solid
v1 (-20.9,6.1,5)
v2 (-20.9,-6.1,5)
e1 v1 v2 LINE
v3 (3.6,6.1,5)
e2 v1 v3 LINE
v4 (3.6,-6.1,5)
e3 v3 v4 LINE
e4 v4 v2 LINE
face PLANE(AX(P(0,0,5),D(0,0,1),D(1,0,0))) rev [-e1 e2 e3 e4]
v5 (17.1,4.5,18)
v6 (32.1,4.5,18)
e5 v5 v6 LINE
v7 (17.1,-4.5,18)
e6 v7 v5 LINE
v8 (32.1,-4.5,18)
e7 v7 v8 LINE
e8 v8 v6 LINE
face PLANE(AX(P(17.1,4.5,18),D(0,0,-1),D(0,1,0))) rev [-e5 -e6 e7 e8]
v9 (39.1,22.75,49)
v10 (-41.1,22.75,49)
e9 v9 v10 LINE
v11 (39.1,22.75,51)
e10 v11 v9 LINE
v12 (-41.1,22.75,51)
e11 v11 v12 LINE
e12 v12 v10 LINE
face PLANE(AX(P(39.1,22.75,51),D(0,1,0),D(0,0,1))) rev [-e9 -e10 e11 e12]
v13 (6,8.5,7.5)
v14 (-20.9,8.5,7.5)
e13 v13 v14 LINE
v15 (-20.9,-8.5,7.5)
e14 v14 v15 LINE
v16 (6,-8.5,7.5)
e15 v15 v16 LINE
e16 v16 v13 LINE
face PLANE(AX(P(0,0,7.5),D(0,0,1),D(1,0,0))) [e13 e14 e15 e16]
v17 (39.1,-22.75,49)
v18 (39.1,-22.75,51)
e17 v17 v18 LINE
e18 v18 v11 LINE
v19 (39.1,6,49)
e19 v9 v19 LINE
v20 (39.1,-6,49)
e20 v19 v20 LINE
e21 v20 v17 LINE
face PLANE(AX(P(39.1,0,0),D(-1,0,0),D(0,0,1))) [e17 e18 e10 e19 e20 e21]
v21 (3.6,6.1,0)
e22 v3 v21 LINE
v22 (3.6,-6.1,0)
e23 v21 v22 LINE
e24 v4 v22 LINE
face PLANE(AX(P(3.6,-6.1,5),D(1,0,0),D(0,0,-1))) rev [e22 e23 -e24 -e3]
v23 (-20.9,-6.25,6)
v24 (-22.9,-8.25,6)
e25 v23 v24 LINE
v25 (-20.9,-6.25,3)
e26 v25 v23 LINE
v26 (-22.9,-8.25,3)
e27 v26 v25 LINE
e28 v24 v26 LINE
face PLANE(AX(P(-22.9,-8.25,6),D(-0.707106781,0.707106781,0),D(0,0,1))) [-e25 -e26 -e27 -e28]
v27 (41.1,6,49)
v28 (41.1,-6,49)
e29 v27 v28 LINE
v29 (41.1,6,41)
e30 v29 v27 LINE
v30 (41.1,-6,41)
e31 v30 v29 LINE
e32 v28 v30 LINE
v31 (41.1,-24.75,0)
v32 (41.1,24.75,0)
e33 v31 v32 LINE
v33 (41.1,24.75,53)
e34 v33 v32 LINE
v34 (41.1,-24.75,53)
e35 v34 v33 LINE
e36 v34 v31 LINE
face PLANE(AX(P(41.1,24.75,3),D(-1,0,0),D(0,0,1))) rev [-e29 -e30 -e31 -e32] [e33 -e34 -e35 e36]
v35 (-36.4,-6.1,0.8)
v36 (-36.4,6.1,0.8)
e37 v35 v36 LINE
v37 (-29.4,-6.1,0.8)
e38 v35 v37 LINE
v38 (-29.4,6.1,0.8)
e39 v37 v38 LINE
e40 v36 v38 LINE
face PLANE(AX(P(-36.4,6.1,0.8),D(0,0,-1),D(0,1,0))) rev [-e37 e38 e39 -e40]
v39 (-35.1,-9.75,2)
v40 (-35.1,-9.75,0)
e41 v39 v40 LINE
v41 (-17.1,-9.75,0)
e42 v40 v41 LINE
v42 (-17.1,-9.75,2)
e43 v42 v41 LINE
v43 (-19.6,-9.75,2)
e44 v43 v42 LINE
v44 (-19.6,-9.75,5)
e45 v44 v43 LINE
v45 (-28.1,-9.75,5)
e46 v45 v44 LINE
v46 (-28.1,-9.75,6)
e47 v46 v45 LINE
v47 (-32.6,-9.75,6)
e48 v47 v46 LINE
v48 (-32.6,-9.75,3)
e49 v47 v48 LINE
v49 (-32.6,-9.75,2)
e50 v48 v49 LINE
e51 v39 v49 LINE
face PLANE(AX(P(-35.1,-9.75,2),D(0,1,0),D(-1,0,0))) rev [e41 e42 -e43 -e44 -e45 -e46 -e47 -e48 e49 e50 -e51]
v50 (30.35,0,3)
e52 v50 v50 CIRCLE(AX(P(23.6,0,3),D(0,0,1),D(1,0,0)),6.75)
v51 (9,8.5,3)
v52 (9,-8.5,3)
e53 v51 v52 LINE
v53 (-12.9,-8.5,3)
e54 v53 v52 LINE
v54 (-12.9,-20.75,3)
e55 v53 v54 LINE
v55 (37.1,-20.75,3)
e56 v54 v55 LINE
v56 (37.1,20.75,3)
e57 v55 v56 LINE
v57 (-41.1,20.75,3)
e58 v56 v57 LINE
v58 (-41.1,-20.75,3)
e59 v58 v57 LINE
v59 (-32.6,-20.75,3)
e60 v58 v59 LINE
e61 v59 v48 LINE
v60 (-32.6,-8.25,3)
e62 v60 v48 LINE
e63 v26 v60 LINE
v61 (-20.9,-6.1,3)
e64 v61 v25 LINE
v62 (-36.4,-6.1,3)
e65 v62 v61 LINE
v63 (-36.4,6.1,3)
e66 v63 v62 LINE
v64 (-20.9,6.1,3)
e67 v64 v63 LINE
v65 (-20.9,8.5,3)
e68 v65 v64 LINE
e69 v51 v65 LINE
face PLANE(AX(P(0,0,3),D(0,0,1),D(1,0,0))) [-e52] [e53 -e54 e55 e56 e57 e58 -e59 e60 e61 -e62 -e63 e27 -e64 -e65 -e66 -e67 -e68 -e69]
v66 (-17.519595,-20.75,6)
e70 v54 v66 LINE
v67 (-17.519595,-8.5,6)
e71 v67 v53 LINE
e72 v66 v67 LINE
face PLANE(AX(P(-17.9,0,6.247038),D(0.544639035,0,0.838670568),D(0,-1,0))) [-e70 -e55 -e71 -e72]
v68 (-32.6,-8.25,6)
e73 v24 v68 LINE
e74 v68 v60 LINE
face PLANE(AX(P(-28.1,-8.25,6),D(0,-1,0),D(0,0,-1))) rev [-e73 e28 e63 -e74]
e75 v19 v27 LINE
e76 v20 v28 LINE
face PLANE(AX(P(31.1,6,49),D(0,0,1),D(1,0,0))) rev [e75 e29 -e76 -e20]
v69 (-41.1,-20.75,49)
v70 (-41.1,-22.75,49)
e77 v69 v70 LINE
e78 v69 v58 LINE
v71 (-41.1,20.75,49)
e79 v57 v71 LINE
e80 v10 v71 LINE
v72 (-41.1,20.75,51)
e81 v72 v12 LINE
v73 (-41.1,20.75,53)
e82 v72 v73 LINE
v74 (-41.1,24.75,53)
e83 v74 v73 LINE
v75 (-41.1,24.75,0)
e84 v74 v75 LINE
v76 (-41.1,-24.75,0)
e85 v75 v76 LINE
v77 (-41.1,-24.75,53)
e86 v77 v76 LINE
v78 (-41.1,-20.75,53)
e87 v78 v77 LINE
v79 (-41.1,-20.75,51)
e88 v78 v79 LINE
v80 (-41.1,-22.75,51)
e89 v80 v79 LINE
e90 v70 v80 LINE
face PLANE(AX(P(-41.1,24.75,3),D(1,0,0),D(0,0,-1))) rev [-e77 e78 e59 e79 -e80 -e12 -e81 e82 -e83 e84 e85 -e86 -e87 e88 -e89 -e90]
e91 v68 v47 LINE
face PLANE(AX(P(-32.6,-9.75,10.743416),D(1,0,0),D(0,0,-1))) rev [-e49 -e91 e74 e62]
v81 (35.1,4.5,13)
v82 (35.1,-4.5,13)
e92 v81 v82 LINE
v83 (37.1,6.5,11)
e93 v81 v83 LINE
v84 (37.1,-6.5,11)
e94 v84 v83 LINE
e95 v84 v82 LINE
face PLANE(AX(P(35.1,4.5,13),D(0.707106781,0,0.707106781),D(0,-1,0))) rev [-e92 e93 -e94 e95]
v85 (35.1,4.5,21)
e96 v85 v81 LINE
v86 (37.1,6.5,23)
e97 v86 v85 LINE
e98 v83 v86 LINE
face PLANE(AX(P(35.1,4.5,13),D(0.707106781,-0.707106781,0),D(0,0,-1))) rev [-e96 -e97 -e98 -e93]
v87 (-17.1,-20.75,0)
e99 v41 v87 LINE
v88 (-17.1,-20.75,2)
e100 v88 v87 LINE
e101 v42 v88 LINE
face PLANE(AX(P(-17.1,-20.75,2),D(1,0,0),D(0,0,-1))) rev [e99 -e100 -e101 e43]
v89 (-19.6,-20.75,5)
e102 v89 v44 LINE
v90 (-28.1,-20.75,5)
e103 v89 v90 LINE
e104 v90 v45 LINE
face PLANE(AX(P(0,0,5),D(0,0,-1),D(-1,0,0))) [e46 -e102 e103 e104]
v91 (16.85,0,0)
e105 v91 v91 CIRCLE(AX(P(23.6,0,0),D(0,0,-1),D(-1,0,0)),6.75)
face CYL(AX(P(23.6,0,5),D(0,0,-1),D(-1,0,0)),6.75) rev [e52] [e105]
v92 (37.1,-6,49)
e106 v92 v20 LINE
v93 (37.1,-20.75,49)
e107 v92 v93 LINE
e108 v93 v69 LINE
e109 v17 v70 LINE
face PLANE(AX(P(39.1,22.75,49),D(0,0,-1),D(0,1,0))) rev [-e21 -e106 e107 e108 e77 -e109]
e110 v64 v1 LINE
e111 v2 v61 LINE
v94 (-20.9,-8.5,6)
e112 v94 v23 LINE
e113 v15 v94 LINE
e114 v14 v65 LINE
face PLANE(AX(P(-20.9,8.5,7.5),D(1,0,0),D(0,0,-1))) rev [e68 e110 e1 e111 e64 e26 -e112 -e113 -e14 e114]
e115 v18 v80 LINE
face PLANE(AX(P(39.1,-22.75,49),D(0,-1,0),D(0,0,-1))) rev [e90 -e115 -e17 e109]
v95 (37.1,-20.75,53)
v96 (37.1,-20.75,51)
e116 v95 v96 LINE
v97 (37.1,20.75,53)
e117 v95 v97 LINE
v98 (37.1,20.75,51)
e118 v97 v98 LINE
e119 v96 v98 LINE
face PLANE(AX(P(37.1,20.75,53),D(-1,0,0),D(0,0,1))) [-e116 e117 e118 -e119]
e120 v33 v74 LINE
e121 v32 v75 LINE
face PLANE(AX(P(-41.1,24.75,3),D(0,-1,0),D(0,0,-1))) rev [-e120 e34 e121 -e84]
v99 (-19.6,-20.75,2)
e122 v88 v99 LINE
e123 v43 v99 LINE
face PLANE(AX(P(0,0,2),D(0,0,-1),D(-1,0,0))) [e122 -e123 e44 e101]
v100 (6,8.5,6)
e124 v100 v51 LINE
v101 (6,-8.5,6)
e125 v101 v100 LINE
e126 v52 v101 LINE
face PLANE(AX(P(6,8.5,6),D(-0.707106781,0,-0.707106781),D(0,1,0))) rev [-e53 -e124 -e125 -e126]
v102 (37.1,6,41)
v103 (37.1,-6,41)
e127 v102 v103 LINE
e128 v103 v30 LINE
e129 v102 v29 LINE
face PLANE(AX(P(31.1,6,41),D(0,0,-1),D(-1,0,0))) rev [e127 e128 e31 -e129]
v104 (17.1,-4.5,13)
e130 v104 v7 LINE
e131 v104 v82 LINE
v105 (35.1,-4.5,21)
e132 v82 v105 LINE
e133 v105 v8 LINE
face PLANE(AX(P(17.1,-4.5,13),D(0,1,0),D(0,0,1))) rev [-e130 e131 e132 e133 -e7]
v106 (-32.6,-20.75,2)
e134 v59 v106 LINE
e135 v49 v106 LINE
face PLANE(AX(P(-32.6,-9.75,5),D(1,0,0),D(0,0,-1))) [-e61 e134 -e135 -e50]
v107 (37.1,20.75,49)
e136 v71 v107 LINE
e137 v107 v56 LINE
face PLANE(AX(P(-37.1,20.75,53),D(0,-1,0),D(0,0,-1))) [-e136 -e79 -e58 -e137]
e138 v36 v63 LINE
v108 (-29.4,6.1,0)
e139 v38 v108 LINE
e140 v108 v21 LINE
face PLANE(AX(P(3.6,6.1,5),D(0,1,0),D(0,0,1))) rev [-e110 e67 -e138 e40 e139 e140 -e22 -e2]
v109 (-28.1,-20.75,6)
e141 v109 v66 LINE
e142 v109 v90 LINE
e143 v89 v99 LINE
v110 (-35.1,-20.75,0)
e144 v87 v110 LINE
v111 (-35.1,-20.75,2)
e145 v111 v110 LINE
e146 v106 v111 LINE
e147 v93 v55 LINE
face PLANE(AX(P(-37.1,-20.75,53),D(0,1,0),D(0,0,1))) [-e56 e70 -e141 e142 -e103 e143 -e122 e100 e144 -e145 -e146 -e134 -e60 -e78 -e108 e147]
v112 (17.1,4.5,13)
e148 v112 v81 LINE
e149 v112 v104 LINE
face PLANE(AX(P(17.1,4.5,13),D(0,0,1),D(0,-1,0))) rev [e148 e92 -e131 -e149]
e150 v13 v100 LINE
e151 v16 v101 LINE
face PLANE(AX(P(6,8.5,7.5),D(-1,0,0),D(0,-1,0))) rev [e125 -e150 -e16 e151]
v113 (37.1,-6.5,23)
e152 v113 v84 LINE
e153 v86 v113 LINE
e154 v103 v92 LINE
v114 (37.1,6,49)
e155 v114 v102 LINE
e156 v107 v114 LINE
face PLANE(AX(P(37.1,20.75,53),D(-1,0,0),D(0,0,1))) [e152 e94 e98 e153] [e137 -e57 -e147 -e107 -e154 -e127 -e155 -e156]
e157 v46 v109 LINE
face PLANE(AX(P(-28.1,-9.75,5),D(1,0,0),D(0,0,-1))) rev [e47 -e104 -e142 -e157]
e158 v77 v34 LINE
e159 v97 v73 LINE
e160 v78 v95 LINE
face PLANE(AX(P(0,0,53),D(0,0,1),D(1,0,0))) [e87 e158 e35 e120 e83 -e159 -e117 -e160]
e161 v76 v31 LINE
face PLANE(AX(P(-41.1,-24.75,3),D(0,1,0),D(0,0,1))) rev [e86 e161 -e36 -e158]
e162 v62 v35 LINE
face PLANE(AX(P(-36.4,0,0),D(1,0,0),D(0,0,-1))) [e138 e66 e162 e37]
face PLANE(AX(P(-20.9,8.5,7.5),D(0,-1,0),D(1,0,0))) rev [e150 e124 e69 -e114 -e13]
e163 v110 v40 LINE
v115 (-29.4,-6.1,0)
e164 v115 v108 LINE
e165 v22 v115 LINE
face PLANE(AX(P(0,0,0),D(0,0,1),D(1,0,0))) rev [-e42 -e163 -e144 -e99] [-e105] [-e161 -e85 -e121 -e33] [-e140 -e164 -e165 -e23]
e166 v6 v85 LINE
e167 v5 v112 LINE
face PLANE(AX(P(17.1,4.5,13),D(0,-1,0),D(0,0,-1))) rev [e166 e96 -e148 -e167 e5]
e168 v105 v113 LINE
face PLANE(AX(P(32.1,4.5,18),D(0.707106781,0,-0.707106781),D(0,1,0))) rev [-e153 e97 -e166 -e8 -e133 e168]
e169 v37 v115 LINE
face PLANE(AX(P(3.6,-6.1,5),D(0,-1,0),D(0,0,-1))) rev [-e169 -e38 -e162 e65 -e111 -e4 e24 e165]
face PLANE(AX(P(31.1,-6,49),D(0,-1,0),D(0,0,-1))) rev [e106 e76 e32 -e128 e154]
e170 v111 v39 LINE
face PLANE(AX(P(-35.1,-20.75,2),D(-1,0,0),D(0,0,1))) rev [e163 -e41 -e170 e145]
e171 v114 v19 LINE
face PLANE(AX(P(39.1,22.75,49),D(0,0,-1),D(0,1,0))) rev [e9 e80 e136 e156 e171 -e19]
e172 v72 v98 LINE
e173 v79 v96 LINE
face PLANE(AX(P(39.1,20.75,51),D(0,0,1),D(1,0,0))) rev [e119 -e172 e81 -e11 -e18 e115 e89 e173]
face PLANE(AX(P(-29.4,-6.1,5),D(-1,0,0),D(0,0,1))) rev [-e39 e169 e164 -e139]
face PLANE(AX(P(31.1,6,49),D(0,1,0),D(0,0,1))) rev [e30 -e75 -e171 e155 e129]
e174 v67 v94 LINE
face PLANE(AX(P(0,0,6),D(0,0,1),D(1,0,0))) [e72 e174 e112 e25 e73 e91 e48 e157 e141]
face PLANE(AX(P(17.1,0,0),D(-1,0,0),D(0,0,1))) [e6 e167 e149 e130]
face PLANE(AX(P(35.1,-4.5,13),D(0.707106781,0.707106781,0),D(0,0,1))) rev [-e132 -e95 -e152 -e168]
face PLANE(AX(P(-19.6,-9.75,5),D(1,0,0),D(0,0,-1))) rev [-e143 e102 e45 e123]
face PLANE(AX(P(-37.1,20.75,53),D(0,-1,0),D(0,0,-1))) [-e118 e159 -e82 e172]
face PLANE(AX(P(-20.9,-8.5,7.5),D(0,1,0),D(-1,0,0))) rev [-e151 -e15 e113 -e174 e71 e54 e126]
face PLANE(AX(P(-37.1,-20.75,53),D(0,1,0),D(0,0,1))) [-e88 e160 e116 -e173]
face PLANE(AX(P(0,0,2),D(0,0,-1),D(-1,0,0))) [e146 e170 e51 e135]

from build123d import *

# Parameters (mm, degrees)
ESQUISSE1_W              = 82.2
ESQUISSE1_H              = 49.5
BOSS_EXTRU_1_DEPTH       = 3
ESQUISSE2_W              = 82.2
ESQUISSE2_H              = 49.5
ESQUISSE2_W_2            = 74.2
ESQUISSE2_H_2            = 41.5
BOSS_EXTRU_2_DEPTH       = 50
ESQUISSE4_W              = 2
ESQUISSE4_H              = 41.5
ENL_V_MAT_EXTRU_3_DEPTH  = 16
ENL_V_MAT_EXTRU_4_DEPTH  = 80.2
ESQUISSE6_W              = 46
ESQUISSE6_H              = 41.5
ENL_V_MAT_EXTRU_5_DEPTH  = 10
ESQUISSE7_W              = 5
ESQUISSE7_H              = 9
BOSS_EXTRU_3_DEPTH       = 20
CHANFREIN1_SIZE          = 5
CHANFREIN2_SIZE          = 2
CHANFREIN3_SIZE          = 2
ESQUISSE8_R              = 6.75
ENL_V_MAT_EXTRU_6_DEPTH  = 5
ESQUISSE10_W             = 26.9
ESQUISSE10_H             = 17
BOSS_EXTRU_4_DEPTH       = 4.5
ESQUISSE9_W              = 33
ESQUISSE9_H              = 12.2
ENL_V_MAT_EXTRU_8_DEPTH  = 5
ESQUISSE11_W             = 2.2
ESQUISSE11_H             = 12.2
ENL_V_MAT_EXTRU_9_DEPTH  = 7
ESQUISSE12_W             = 18
ESQUISSE12_H             = 11
ENL_V_MAT_EXTRU_10_DEPTH = 2
ESQUISSE13_W             = 4.5
ESQUISSE13_H             = 11
ENL_V_MAT_EXTRU_11_DEPTH = 3
ESQUISSE14_W             = 4
ESQUISSE14_H             = 11
BOSS_EXTRU_5_DEPTH       = 3
ESQUISSE15_W             = 4
ESQUISSE15_H             = 11
ENL_V_MAT_EXTRU_12_DEPTH = 3
ESQUISSE16_W             = 7
ESQUISSE16_H             = 1.5
BOSS_EXTRU_6_DEPTH       = 3
CHANFREIN4_SIZE          = 3
ESQUISSE18_W             = 0.2
ESQUISSE18_H             = 1.5
ESQUISSE18_W_2           = 4.5
BOSS_EXTRU_8_DEPTH       = 3
ESQUISSE19_W             = 3
ESQUISSE19_H             = 1.25
BOSS_EXTRU_9_DEPTH       = 3
ESQUISSE20_W             = 1.7
ESQUISSE20_H             = 2
BOSS_EXTRU_10_DEPTH      = 11
CHANFREIN10_SIZE         = 3.247037966
CHANFREIN10_SIZE_2       = 5
CHANFREIN11_SIZE         = 2
ESQUISSE21_W             = 8
ESQUISSE21_H             = 12
ENL_V_MAT_EXTRU_13_DEPTH = 10


with BuildPart() as part:
    # Esquisse1 → Boss.-Extru.1 (new body)
    with BuildSketch(Plane.XY):
        Rectangle(ESQUISSE1_W, ESQUISSE1_H)
    extrude(amount=BOSS_EXTRU_1_DEPTH)

    # Esquisse2 → Boss.-Extru.2 (add)
    with BuildSketch(Plane.XY.offset(3)):
        Rectangle(ESQUISSE2_W, ESQUISSE2_H)
        Rectangle(ESQUISSE2_W_2, ESQUISSE2_H_2, mode=Mode.SUBTRACT)
    extrude(amount=BOSS_EXTRU_2_DEPTH)

    # Esquisse4 → Enlèv. mat.-Extru.3 (cut)
    with BuildSketch(Plane(origin=(-37.1, 0, 0), x_dir=(0, 0, -1), z_dir=(1, 0, 0))):
        with Locations((-52, 0)):
            Rectangle(ESQUISSE4_W, ESQUISSE4_H)
    extrude(amount=-ENL_V_MAT_EXTRU_3_DEPTH, mode=Mode.SUBTRACT)

    # Esquisse5 → Enlèv. mat.-Extru.4 (cut)
    with BuildSketch(Plane.ZY.offset(41.1)):
        Polygon((51, 22.75), (49, 22.75), (49, -22.75), (51, -22.75), (51, -20.75), (51, 20.75), align=None)
    extrude(amount=-ENL_V_MAT_EXTRU_4_DEPTH, mode=Mode.SUBTRACT)

    # Esquisse6 → Enlèv. mat.-Extru.5 (cut)
    with BuildSketch(Plane(origin=(-37.1, 0, 0), x_dir=(0, 0, -1), z_dir=(1, 0, 0))):
        with Locations((-26, 0)):
            Rectangle(ESQUISSE6_W, ESQUISSE6_H)
    extrude(amount=-ENL_V_MAT_EXTRU_5_DEPTH, mode=Mode.SUBTRACT)

    # Esquisse7 → Boss.-Extru.3 (add)
    with BuildSketch(Plane.ZY.offset(-37.1)):
        with Locations((15.5, 0)):
            Rectangle(ESQUISSE7_W, ESQUISSE7_H)
    extrude(amount=BOSS_EXTRU_3_DEPTH)

    # Chanfrein1
    chanfrein1_edges = [part.edges().sort_by_distance(p)[0] for p in [
        (37.1, 0, 18),
    ]]
    chamfer(chanfrein1_edges, length=CHANFREIN1_SIZE)

    # Chanfrein2
    chanfrein2_edges = [part.edges().sort_by_distance(p)[0] for p in [
        (37.1, 0, 13),
    ]]
    chamfer(chanfrein2_edges, length=CHANFREIN2_SIZE)

    # Chanfrein3
    chanfrein3_edges = [part.edges().sort_by_distance(p)[0] for p in [
        (37.1, -4.5, 17),
        (37.1, 4.5, 17),
    ]]
    chamfer(chanfrein3_edges, length=CHANFREIN3_SIZE)

    # Esquisse8 → Enlèv. mat.-Extru.6 (cut)
    with BuildSketch(Plane(origin=(0, 0, 0), x_dir=(-1, 0, 0), z_dir=(0, 0, -1))):
        with Locations((-23.6, 0)):
            Circle(ESQUISSE8_R)
    extrude(amount=-ENL_V_MAT_EXTRU_6_DEPTH, mode=Mode.SUBTRACT)

    # Esquisse10 → Boss.-Extru.4 (add)
    with BuildSketch(Plane.XY.offset(3)):
        with Locations((-7.45, 0)):
            Rectangle(ESQUISSE10_W, ESQUISSE10_H)
    extrude(amount=BOSS_EXTRU_4_DEPTH)

    # Esquisse9 → Enlèv. mat.-Extru.8 (cut)
    with BuildSketch(Plane(origin=(0, 0, 0), x_dir=(-1, 0, 0), z_dir=(0, 0, -1))):
        with Locations((12.9, 0)):
            Rectangle(ESQUISSE9_W, ESQUISSE9_H)
    extrude(amount=-ENL_V_MAT_EXTRU_8_DEPTH, mode=Mode.SUBTRACT)

    # Esquisse11 → Enlèv. mat.-Extru.9 (cut)
    with BuildSketch(Plane(origin=(-29.4, 0, 0), x_dir=(0, 0, -1), z_dir=(1, 0, 0))):
        with Locations((-1.9, 0)):
            Rectangle(ESQUISSE11_W, ESQUISSE11_H)
    extrude(amount=-ENL_V_MAT_EXTRU_9_DEPTH, mode=Mode.SUBTRACT)

    # Esquisse12 → Enlèv. mat.-Extru.10 (cut)
    with BuildSketch(Plane(origin=(0, 0, 0), x_dir=(-1, 0, 0), z_dir=(0, 0, -1))):
        with Locations((26.1, -15.25)):
            Rectangle(ESQUISSE12_W, ESQUISSE12_H)
    extrude(amount=-ENL_V_MAT_EXTRU_10_DEPTH, mode=Mode.SUBTRACT)

    # Esquisse13 → Enlèv. mat.-Extru.11 (cut)
    with BuildSketch(Plane(origin=(0, 0, 2), x_dir=(-1, 0, 0), z_dir=(0, 0, -1))):
        with Locations((21.85, -15.25)):
            Rectangle(ESQUISSE13_W, ESQUISSE13_H)
        with Locations((30.35, -15.25)):
            Rectangle(ESQUISSE13_W, ESQUISSE13_H)
    extrude(amount=-ENL_V_MAT_EXTRU_11_DEPTH, mode=Mode.SUBTRACT)

    # Esquisse14 → Boss.-Extru.5 (add)
    with BuildSketch(Plane.XY.offset(3)):
        with Locations((-26.1, -15.25)):
            Rectangle(ESQUISSE14_W, ESQUISSE14_H)
    extrude(amount=BOSS_EXTRU_5_DEPTH)

    # Esquisse15 → Enlèv. mat.-Extru.12 (cut)
    with BuildSketch(Plane(origin=(0, 0, 2), x_dir=(-1, 0, 0), z_dir=(0, 0, -1))):
        with Locations((26.1, -15.25)):
            Rectangle(ESQUISSE15_W, ESQUISSE15_H)
    extrude(amount=-ENL_V_MAT_EXTRU_12_DEPTH, mode=Mode.SUBTRACT)

    # Esquisse16 → Boss.-Extru.6 (add)
    with BuildSketch(Plane.XY.offset(3)):
        with Locations((-24.6, -9)):
            Rectangle(ESQUISSE16_W, ESQUISSE16_H)
    extrude(amount=BOSS_EXTRU_6_DEPTH)

    # Chanfrein4
    chanfrein4_edges = [part.edges().sort_by_distance(p)[0] for p in [
        (6, 0, 3),
    ]]
    chamfer(chanfrein4_edges, length=CHANFREIN4_SIZE)

    # Esquisse18 → Boss.-Extru.8 (add)
    with BuildSketch(Plane.XY.offset(3)):
        with Locations((-21, -9)):
            Rectangle(ESQUISSE18_W, ESQUISSE18_H)
        with Locations((-30.35, -9)):
            Rectangle(ESQUISSE18_W_2, ESQUISSE18_H)
    extrude(amount=BOSS_EXTRU_8_DEPTH)

    # Esquisse19 → Boss.-Extru.9 (add)
    with BuildSketch(Plane(origin=(-20.9, 0, 0), x_dir=(0, 0, -1), z_dir=(1, 0, 0))):
        with Locations((-4.5, -9.125)):
            Rectangle(ESQUISSE19_W, ESQUISSE19_H)
    extrude(amount=BOSS_EXTRU_9_DEPTH)

    # Esquisse20 → Boss.-Extru.10 (add)
    with BuildSketch(Plane(origin=(0, -9.75, 0), x_dir=(-1, 0, 0), z_dir=(0, -1, 0))):
        Polygon((17.9, -6), (24.1, -6), (24.1, -5), (19.6, -5), (17.9, -5), align=None)
        with Locations((18.75, -4)):
            Rectangle(ESQUISSE20_W, ESQUISSE20_H)
    extrude(amount=BOSS_EXTRU_10_DEPTH)

    # Chanfrein10
    # the kernel refuses this chamfer: 5, 3.247037966 mm, written as the material it adds along each edge
    with BuildSketch(Plane(origin=(-17.9, 4.422205001, 3), x_dir=(-0.04991856572298826, 0, 0.9987532912567346), z_dir=(0, -1, 0))) as chanfrein10_piece_1_section:
        Polygon((CHANFREIN10_SIZE * 0.998753291253, -CHANFREIN10_SIZE * 0.0499185657228), (-CHANFREIN10_SIZE_2 * 0.049918565723, -CHANFREIN10_SIZE_2 * 0.998753291257), (0, 0), align=None)
    chanfrein10_piece_1 = extrude(amount=25.172205001, mode=Mode.PRIVATE)
    chanfrein10_piece_1 = split(chanfrein10_piece_1, bisect_by=Plane(origin=(-17.932311405, -8.5, 6.135567439), z_dir=(0, 1, 0)), keep=Keep.TOP, mode=Mode.PRIVATE)
    chanfrein10_piece_1 = split(chanfrein10_piece_1, bisect_by=Plane(origin=(-17.932311405, -2.038897499, 6), z_dir=(0, 0, 1)), keep=Keep.TOP, mode=Mode.PRIVATE)
    add(chanfrein10_piece_1)
    with BuildSketch(Plane(origin=(-17.9, -8.5, 3), x_dir=(-0.04991856572298826, 0, 0.9987532912567346), z_dir=(0, -1, 0))) as chanfrein10_piece_2_section:
        Polygon((CHANFREIN10_SIZE * 0.998753291253, -CHANFREIN10_SIZE * 0.0499185657228), (-CHANFREIN10_SIZE_2 * 0.049918565723, -CHANFREIN10_SIZE_2 * 0.998753291257), (0, 0), align=None)
    chanfrein10_piece_2 = extrude(amount=12.25, mode=Mode.PRIVATE)
    chanfrein10_piece_2 = split(chanfrein10_piece_2, bisect_by=Plane(origin=(-16.206622299, -14.625, 6), z_dir=(0, 0, -1)), keep=Keep.TOP, mode=Mode.PRIVATE)
    add(chanfrein10_piece_2)

    # Chanfrein11
    chanfrein11_edges = [part.edges().sort_by_distance(p)[0] for p in [
        (-20.9, -8.25, 4.5),
    ]]
    chamfer(chanfrein11_edges, length=CHANFREIN11_SIZE)

    # Esquisse21 → Enlèv. mat.-Extru.13 (cut)
    with BuildSketch(Plane(origin=(41.1, 0, 0), x_dir=(0, 0, -1), z_dir=(1, 0, 0))):
        with Locations((-45, 0)):
            Rectangle(ESQUISSE21_W, ESQUISSE21_H)
    extrude(amount=-ENL_V_MAT_EXTRU_13_DEPTH, mode=Mode.SUBTRACT)


solid = part.part
